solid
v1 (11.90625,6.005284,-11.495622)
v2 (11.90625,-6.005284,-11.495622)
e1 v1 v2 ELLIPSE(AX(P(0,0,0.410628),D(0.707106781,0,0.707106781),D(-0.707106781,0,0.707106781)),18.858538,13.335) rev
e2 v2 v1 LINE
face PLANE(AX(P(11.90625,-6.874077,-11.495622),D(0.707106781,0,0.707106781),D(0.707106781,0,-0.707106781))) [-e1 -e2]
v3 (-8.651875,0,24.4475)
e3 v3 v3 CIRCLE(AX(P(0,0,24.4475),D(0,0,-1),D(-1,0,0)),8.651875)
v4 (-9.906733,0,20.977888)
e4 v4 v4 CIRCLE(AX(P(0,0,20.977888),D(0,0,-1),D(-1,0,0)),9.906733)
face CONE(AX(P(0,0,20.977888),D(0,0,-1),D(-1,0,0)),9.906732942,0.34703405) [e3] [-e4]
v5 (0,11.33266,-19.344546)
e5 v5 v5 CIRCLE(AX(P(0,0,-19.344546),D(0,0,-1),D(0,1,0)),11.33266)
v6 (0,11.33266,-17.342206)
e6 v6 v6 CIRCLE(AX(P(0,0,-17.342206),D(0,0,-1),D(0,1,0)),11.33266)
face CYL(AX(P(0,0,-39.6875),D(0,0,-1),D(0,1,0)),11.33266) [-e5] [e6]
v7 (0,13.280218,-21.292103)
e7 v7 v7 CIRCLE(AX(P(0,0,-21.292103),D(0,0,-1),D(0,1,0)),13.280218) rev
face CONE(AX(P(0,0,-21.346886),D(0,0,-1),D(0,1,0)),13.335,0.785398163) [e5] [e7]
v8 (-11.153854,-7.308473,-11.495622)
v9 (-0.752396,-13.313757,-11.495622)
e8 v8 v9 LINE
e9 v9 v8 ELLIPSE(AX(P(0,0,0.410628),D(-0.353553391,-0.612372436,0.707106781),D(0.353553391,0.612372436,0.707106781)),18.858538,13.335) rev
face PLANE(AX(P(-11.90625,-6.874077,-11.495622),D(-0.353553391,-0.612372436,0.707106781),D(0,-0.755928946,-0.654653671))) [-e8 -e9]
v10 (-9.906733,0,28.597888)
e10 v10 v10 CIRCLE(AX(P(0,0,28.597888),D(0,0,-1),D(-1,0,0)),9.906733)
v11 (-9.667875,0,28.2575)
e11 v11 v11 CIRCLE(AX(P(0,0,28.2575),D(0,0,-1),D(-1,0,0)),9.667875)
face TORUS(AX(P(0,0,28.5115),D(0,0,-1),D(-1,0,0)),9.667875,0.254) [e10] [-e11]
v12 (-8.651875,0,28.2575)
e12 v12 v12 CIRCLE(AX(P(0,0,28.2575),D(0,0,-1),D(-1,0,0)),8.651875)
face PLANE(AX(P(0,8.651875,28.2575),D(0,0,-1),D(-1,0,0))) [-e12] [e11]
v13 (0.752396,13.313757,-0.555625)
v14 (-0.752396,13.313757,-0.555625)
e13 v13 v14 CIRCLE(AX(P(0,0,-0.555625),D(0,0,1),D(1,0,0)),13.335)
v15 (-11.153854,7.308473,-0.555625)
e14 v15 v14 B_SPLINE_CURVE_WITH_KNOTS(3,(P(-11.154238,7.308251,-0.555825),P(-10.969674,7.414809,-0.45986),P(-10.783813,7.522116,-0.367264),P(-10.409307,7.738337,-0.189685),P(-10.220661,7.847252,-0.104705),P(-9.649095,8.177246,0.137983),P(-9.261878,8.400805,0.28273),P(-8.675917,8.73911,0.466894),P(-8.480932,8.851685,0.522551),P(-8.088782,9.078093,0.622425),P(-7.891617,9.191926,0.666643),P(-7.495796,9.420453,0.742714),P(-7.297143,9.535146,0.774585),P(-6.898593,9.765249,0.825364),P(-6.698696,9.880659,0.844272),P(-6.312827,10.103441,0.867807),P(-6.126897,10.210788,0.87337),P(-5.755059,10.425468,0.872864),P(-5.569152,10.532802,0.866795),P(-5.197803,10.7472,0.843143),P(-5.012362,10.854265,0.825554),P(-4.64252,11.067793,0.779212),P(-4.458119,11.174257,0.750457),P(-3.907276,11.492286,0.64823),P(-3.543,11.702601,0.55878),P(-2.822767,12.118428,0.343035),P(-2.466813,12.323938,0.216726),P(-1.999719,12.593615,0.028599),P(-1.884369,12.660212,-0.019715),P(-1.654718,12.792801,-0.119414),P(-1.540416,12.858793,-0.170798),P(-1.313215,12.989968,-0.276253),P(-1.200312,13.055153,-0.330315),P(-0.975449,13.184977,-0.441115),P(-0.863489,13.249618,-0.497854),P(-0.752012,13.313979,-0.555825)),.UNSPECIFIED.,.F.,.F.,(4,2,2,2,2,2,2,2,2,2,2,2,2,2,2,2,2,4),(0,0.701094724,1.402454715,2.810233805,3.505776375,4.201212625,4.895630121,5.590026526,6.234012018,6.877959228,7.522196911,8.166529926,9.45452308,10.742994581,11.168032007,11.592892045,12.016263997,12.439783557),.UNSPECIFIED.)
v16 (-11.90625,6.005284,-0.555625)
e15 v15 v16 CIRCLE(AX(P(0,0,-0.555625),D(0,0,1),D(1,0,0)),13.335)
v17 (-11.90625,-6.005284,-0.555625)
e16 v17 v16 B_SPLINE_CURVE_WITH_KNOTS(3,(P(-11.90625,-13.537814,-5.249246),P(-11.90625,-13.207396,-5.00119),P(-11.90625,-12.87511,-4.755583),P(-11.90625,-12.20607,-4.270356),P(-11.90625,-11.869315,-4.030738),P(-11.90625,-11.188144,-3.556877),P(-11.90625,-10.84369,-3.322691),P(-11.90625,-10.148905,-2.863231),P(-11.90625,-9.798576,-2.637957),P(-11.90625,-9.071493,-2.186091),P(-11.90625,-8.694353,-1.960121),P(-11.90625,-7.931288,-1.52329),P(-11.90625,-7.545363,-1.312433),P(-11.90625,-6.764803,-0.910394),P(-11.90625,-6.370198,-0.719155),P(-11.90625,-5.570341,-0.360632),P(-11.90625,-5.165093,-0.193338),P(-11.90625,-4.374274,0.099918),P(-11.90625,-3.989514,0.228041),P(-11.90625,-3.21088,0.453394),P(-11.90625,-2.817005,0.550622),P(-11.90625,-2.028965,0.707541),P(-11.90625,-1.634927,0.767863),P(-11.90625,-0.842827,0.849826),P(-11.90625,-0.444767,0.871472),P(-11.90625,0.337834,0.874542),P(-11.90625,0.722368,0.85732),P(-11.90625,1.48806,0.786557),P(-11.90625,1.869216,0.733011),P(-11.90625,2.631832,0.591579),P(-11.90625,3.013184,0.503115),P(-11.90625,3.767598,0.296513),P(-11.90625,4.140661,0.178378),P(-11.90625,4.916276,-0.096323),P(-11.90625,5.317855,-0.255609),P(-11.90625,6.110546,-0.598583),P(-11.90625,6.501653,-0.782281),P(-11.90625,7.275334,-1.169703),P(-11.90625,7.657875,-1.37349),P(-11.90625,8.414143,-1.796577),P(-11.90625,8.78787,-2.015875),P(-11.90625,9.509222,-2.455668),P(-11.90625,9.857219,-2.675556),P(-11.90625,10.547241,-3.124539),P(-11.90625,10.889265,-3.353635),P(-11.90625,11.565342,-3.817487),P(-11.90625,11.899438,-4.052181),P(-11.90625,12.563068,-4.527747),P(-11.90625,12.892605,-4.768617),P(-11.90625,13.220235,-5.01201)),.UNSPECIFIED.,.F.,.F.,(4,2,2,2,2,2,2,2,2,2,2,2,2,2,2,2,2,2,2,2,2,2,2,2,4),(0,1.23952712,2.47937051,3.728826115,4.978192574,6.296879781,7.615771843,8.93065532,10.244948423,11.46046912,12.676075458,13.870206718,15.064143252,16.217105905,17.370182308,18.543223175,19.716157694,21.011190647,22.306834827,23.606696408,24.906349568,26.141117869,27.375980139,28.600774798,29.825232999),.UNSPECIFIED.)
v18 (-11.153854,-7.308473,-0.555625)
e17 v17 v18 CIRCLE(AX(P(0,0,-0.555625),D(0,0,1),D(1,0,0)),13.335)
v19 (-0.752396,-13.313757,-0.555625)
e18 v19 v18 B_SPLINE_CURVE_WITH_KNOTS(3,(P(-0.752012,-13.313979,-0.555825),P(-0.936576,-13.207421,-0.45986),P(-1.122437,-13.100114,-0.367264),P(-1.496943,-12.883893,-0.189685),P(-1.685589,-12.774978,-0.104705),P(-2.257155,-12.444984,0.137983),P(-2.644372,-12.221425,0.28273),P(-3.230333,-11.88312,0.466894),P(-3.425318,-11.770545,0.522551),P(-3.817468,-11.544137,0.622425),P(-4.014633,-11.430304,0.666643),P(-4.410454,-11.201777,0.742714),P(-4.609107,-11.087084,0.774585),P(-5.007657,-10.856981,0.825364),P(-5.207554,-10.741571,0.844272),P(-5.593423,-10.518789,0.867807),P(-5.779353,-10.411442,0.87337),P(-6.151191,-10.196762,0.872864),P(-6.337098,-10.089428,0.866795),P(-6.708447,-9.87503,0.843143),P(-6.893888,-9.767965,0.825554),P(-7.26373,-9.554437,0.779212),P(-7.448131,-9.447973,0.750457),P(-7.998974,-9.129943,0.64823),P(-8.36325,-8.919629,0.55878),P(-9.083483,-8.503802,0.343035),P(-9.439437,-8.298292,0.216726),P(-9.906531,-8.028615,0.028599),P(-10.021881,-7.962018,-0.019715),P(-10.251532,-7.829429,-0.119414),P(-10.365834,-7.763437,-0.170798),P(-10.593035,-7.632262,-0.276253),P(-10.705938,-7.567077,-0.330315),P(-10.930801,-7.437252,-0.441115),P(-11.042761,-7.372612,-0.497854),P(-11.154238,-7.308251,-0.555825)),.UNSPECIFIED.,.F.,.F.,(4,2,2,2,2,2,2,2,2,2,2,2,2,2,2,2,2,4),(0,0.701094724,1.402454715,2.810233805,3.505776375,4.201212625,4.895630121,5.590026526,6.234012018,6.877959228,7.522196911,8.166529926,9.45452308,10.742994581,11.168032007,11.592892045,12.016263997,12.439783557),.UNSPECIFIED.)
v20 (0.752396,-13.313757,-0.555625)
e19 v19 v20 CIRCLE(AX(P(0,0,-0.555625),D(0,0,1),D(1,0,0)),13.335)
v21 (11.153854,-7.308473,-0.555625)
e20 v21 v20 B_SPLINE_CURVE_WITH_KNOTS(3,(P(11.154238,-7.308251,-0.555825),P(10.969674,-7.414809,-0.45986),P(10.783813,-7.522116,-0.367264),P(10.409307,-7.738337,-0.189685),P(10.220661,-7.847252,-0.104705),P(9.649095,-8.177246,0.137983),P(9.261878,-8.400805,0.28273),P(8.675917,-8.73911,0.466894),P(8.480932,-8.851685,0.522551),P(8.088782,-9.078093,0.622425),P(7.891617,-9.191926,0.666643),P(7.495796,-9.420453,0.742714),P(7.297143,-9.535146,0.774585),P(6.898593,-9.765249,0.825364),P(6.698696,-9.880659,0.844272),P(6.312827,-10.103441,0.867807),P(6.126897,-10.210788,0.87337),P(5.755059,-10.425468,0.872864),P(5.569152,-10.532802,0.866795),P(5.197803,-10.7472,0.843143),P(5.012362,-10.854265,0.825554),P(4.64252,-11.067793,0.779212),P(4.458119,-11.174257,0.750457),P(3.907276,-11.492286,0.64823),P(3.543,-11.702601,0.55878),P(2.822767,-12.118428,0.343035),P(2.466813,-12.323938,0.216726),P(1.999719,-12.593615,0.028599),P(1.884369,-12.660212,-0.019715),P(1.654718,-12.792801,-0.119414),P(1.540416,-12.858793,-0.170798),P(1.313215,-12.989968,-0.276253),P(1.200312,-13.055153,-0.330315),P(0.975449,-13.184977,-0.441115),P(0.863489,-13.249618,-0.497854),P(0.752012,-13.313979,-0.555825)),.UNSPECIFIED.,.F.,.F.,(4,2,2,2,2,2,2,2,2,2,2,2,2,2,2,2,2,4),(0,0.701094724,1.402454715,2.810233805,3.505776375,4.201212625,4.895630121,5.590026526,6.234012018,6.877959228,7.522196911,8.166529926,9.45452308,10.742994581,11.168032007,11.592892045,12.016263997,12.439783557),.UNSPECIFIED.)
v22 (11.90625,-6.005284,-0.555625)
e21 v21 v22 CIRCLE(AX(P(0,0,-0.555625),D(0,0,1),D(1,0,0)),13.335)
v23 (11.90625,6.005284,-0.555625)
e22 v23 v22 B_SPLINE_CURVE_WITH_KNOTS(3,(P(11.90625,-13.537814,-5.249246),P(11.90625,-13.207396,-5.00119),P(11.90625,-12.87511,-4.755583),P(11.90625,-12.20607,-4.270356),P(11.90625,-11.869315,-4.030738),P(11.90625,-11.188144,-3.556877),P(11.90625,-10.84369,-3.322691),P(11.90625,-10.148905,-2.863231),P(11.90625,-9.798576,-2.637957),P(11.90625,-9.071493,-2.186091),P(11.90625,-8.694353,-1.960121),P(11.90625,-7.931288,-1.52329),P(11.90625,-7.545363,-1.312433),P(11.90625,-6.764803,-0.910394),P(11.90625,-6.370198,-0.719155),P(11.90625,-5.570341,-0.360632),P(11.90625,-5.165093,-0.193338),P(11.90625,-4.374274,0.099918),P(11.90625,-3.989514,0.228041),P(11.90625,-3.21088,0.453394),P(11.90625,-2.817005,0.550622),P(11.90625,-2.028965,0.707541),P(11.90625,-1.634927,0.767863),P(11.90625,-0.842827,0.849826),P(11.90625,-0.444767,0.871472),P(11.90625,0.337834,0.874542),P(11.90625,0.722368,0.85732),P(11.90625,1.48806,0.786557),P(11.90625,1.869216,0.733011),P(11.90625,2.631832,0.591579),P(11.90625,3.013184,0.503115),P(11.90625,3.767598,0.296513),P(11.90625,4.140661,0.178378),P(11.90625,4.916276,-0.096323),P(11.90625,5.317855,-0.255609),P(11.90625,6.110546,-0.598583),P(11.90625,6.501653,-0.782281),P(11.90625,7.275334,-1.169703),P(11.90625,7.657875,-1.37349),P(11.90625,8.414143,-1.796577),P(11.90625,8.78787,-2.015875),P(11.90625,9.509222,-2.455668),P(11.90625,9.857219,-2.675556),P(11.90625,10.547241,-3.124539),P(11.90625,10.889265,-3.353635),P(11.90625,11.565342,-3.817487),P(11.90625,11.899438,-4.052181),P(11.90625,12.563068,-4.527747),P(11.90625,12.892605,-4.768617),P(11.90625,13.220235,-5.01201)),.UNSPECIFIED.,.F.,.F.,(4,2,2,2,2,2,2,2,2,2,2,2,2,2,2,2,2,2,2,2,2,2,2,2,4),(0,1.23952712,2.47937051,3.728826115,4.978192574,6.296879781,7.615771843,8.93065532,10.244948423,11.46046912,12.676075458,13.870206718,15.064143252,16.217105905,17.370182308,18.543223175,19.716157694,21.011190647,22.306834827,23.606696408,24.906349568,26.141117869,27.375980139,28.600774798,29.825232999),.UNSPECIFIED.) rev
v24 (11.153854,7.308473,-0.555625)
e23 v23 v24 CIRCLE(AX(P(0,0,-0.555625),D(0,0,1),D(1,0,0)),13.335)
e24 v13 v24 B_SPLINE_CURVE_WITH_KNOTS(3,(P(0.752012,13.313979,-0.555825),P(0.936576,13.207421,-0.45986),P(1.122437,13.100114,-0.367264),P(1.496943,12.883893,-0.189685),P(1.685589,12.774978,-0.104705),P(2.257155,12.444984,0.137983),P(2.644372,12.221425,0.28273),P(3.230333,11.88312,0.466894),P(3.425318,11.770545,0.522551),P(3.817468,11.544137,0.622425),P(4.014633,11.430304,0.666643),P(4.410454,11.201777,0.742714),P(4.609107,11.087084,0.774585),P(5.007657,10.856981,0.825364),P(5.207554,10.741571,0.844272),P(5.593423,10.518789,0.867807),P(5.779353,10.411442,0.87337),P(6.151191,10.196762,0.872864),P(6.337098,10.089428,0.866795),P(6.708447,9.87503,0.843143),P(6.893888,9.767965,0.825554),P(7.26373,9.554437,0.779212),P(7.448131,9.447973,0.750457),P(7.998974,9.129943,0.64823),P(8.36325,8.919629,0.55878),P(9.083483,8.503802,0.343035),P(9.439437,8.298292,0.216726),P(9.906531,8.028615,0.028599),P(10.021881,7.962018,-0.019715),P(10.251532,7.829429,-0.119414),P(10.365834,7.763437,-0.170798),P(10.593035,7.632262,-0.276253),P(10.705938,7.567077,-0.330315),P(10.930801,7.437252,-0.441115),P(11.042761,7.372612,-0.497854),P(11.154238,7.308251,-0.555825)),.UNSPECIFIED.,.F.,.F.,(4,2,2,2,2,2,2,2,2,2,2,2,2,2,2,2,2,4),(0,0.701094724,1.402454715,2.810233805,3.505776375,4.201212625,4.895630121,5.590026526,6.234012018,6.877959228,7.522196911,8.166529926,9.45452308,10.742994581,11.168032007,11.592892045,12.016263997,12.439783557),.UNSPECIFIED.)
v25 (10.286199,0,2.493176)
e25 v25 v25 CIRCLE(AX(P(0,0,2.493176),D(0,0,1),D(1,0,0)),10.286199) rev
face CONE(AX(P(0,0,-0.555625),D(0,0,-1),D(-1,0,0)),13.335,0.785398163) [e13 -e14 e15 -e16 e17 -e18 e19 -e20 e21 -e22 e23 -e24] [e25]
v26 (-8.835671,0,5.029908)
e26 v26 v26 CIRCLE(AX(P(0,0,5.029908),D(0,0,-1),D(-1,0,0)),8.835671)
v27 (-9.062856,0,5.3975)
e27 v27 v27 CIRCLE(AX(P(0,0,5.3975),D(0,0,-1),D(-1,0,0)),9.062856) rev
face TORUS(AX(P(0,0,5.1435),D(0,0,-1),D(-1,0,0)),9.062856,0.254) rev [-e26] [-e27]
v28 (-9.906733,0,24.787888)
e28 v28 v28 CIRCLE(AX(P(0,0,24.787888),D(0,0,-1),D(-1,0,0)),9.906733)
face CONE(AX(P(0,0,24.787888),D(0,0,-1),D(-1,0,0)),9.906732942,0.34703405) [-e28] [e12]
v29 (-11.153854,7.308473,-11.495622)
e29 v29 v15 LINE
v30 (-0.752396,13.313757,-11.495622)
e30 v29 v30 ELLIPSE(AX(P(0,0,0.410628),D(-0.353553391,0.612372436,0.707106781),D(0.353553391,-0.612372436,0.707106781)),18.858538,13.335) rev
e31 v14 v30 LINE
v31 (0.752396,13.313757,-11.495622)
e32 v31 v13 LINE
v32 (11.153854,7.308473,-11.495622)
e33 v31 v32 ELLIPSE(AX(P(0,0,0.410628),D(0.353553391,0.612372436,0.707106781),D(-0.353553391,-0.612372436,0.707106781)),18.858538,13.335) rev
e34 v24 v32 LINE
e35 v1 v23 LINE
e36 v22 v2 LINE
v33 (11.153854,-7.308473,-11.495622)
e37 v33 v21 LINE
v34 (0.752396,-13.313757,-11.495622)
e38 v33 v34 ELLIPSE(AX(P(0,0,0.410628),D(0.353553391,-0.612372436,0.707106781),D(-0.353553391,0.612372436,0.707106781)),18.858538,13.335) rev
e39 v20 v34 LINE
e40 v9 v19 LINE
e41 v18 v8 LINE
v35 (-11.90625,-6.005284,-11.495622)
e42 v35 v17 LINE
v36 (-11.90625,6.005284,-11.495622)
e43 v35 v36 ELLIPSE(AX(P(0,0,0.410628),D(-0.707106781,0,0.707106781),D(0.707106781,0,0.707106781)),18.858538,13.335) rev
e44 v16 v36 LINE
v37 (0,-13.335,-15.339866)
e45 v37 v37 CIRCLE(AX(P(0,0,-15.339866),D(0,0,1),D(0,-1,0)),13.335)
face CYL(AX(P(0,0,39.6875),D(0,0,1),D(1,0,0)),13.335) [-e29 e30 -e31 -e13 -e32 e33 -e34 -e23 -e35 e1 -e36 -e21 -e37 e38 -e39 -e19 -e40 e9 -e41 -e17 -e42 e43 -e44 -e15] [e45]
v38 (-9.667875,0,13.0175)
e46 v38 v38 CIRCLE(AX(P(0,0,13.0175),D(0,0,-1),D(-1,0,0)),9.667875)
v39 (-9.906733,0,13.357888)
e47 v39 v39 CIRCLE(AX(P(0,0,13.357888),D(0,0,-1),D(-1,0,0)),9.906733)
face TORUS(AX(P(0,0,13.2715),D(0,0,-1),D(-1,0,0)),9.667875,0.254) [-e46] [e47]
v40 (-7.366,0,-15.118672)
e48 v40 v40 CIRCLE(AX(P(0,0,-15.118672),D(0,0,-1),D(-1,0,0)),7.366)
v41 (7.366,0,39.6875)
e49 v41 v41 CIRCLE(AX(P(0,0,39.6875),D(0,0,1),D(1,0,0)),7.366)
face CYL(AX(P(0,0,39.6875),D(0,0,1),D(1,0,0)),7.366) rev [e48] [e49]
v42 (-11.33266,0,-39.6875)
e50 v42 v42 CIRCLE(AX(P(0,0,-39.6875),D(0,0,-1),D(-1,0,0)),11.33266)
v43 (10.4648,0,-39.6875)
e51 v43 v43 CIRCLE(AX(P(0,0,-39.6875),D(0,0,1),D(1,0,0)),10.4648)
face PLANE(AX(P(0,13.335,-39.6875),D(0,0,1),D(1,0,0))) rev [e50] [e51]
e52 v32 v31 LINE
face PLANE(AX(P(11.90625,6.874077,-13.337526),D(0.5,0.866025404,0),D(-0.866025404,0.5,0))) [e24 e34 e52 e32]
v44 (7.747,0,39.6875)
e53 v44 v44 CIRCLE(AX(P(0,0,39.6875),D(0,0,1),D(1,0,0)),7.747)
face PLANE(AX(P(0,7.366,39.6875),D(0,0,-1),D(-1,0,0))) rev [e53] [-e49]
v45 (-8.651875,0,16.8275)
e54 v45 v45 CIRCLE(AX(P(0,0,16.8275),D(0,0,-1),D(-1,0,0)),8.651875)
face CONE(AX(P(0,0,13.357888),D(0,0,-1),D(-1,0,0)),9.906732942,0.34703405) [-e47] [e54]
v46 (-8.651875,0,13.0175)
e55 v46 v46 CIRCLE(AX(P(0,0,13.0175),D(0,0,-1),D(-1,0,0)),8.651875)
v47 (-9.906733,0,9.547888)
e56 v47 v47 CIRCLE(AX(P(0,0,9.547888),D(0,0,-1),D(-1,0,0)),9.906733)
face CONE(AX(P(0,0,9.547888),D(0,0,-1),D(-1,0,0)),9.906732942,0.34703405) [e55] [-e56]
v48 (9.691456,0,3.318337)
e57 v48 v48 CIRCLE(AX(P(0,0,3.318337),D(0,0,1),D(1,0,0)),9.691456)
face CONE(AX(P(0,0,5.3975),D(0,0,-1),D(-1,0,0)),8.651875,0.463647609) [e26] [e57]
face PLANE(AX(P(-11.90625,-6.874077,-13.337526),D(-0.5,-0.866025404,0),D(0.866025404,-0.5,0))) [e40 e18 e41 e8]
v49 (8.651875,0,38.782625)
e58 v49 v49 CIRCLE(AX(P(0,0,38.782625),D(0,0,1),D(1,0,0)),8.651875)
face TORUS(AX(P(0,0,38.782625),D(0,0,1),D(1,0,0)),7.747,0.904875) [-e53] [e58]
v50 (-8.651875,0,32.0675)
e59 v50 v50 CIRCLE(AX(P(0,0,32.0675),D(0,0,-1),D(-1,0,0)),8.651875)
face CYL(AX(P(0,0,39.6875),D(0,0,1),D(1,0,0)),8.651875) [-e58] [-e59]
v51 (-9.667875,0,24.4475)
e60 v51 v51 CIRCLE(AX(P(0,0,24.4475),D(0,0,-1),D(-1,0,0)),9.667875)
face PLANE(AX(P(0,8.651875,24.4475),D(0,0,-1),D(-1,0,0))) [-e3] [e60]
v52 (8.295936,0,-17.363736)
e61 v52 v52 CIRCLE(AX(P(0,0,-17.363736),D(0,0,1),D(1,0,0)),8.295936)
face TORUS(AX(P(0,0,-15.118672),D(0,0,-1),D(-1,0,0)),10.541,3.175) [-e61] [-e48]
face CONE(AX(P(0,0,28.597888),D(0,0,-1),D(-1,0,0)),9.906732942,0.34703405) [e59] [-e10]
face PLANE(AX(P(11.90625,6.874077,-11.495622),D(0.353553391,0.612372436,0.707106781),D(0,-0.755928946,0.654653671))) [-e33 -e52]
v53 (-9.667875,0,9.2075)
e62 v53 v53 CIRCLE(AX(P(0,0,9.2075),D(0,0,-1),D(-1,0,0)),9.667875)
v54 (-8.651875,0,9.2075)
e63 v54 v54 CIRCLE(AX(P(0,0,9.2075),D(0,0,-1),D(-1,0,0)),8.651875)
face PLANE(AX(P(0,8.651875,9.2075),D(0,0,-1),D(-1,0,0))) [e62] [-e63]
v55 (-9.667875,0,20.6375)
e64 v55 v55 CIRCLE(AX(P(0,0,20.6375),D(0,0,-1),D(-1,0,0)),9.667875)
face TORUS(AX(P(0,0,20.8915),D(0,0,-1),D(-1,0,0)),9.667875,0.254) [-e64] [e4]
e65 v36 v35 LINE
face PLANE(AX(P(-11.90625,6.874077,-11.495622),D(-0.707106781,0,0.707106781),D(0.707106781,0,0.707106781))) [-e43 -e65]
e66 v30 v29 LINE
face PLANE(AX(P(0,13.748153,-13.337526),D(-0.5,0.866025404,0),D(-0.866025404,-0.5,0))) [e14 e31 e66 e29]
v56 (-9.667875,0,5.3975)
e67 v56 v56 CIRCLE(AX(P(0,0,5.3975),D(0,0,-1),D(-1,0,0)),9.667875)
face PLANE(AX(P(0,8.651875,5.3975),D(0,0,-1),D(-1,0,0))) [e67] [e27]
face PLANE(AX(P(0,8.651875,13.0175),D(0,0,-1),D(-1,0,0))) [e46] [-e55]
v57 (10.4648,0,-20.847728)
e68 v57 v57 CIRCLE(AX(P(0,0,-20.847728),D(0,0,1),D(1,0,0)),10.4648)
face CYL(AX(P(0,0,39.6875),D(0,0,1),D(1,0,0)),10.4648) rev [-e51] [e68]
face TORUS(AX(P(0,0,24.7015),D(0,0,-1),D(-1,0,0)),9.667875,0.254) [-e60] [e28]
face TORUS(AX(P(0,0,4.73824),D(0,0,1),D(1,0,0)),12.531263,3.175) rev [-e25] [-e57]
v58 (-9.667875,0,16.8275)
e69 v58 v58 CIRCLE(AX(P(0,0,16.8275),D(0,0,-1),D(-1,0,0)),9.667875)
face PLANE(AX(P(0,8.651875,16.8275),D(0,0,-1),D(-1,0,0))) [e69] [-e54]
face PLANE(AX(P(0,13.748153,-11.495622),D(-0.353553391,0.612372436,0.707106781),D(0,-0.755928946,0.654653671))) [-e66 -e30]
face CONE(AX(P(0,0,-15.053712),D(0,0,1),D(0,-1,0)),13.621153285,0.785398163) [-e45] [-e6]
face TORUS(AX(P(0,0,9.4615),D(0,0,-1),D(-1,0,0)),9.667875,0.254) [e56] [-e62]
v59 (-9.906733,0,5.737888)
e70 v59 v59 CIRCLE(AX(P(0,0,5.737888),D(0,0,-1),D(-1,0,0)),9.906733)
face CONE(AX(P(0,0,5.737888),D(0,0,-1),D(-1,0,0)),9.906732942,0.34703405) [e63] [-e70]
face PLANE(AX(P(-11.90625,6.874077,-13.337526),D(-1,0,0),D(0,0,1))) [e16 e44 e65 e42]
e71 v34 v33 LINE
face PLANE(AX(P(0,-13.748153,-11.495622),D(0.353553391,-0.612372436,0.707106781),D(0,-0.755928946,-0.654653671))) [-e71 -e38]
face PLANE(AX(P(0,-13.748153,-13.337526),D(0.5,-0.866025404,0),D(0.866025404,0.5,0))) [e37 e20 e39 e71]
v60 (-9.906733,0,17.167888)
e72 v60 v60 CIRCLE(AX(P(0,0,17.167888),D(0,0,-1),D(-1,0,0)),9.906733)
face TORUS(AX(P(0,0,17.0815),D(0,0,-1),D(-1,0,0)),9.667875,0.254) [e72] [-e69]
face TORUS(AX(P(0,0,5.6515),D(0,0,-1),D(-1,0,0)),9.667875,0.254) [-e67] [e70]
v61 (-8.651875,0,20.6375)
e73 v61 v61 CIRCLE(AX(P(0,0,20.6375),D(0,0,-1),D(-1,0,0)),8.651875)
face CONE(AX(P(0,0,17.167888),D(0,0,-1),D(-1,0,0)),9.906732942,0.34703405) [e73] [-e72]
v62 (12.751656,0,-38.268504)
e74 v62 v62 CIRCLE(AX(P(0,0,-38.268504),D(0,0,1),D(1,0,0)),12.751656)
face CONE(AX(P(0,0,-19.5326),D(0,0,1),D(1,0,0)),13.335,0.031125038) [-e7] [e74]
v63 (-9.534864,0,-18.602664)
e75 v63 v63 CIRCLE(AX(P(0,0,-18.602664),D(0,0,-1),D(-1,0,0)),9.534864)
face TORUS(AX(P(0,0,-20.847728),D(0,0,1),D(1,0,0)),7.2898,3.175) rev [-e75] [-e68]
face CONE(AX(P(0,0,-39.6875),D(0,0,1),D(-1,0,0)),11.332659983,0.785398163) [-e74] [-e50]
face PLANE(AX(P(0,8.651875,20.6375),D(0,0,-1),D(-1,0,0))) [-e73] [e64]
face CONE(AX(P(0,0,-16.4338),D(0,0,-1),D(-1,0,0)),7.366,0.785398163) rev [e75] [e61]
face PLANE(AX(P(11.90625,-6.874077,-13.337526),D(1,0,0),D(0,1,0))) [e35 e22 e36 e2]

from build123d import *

# Parameters (mm, degrees)
LPATTERN1_COUNT    = 7
LPATTERN1_PITCH    = 3.81
FILLET1_R          = 0.254
FILLET2_R          = 3.175
SKETCH7_OUTSIDE_W  = 211.416
SKETCH7_OUTSIDE_H  = 211.416
SKETCH7_OUTSIDE_R  = 11.332659983
CUT_EXTRUDE1_DEPTH = 82.584527309
CUT_EXTRUDE1_DRAFT = -45
SKETCH9_OUTSIDE_W  = 46.246
SKETCH9_OUTSIDE_H  = 46.246
CUT_EXTRUDE2_DEPTH = 18.735026
CHAMFER1_SIZE      = 1.841903285


# Read off the part's stored shape, not the designer's step: Cut-Revolve2
with BuildPart() as part:
    # Sketch2 → Revolve1 (revolve)
    with BuildSketch(Plane(origin=(0, 0, 0), x_dir=(0, 0, -1), z_dir=(1, 0, 0)), mode=Mode.PRIVATE) as revolve1_sk:
        Polygon((-39.6875, 7.366), (-39.6875, 9.921875), (-2.8575, 9.921875), (0.555625, 13.335), (39.6875, 13.335), (39.6875, 10.4648), (19.5326, 10.4648), (16.4338, 7.366), align=None)
    revolve(revolve1_sk.sketch.rotate(Axis((0, 0, 39.6875), (0, 0, -1)), 90), axis=Axis((0, 0, 39.6875), (0, 0, -1)))

    # Sketch3 → Cut-Revolve1 (revolve, cut)
    with BuildSketch(Plane(origin=(0, 0, 0), x_dir=(0, 0, -1), z_dir=(1, 0, 0)), mode=Mode.PRIVATE) as cut_revolve1_sk:
        with BuildLine():
            Line((-39.6875, 9.921875), (-39.6875, 7.747))
            ThreePointArc((-39.6875, 7.747), (-39.422468249, 8.386843249), (-38.782625, 8.651875))
            Line((-38.782625, 8.651875), (-5.3975, 8.651875))
            Line((-5.3975, 8.651875), (-2.8575, 9.921875))
            Line((-2.8575, 9.921875), (-39.6875, 9.921875))
        make_face()
        Polygon((19.5326, 13.335), (39.6875, 13.335), (39.6875, 12.707475311), align=None)
    revolve(cut_revolve1_sk.sketch.rotate(Axis((0, 0, 39.6875), (0, 0, -1)), 90), axis=Axis((0, 0, 39.6875), (0, 0, -1)), mode=Mode.SUBTRACT)

    # Sketch4 → Revolve2 (revolve)
    with BuildSketch(Plane(origin=(0, 0, 0), x_dir=(0, 0, -1), z_dir=(1, 0, 0)), mode=Mode.PRIVATE) as revolve2_sk:
        with BuildLine():
            Line((-5.3975, 8.651875), (-5.3975, 9.667875))
            ThreePointArc((-5.3975, 9.667875), (-5.505600287, 9.875791507), (-5.737887983, 9.906732942))
            Line((-5.737887983, 9.906732942), (-9.2075, 8.651875))
            Line((-9.2075, 8.651875), (-5.3975, 8.651875))
        make_face()
    revolve2 = revolve(revolve2_sk.sketch.rotate(Axis((0, 0, 5.3975), (0, 0, 1)), 90), axis=Axis((0, 0, 5.3975), (0, 0, 1)))

    # LPattern1: Revolve2 ×7
    with Locations(*[(0, 0, i * LPATTERN1_PITCH) for i in range(1, LPATTERN1_COUNT)]):
        add(revolve2)

    # Fillet1
    fillet1_edges = [part.edges().sort_by_distance(p)[0] for p in [
        (-8.651875, 0, 5.3975),
    ]]
    fillet(fillet1_edges, radius=FILLET1_R)

    # Fillet2
    fillet2_edges = [part.edges().sort_by_distance(p)[0] for p in [
        (-9.921875, 0, 2.8575),
        (-7.366, 0, -16.4338),
        (-10.4648, 0, -19.5326),
    ]]
    fillet(fillet2_edges, radius=FILLET2_R)


with BuildPart() as cut_extrude1_tool:
    # Sketch7 outside → Cut-Extrude1 (with draft: the straight prism first)
    with BuildSketch(Plane(origin=(0, 0, -39.6875), x_dir=(-1, 0, 0), z_dir=(0, 0, -1))):
        Rectangle(SKETCH7_OUTSIDE_W, SKETCH7_OUTSIDE_H)
        Circle(SKETCH7_OUTSIDE_R, mode=Mode.SUBTRACT)
    extrude(amount=-CUT_EXTRUDE1_DEPTH)
    # Cut-Extrude1: the draft: its side faces are tilted about the plane it starts from
    cut_extrude1_sides = [cut_extrude1_tool.faces().sort_by_distance(p)[0] for p in [
        (0, -105.708, 1.604763654),
        (-105.708, 0, 1.604763654),
        (0, 105.708, 1.604763654),
        (105.708, 0, 1.604763654),
        (11.332659983, 0, 1.604763654),
    ]]
    draft(cut_extrude1_sides, Plane(origin=(0, 0, -39.6875), x_dir=(-1, 0, 0), z_dir=(0, 0, -1)), CUT_EXTRUDE1_DRAFT)


with BuildPart() as part_1:
    add(part.part)

    # Cut-Extrude1: cut by cut_extrude1_tool
    add(cut_extrude1_tool.part, mode=Mode.SUBTRACT)

    # Cut-Revolve2 outline → Cut-Revolve2 (revolve, cut)
    with BuildSketch(Plane.XZ):
        Polygon((11.332659983, -17.34220568), (11.332659983, -19.344545697), (13.280217697, -21.292103412), (13.335, -21.292103412), (13.335, -15.339865662), align=None)
    revolve(axis=Axis((0, 0, 0), (0, 0, 1)), mode=Mode.SUBTRACT)

    # Sketch9 outside → Cut-Extrude2 (cut)
    with BuildSketch(Plane.XY.offset(5.3975)):
        Rectangle(SKETCH9_OUTSIDE_W, SKETCH9_OUTSIDE_H)
        Polygon((0, 13.748153285), (-11.90625, 6.874076643), (-11.90625, -6.874076643), (0, -13.748153285), (11.90625, -6.874076643), (11.90625, 6.874076643), align=None, mode=Mode.SUBTRACT)
    extrude(amount=-CUT_EXTRUDE2_DEPTH, mode=Mode.SUBTRACT)

    # Chamfer1
    # the kernel refuses this chamfer: 1.841903285 mm, written as the material it adds along each edge
    with BuildSketch(Plane(origin=(15.256035138, 4.940077291, -13.337526), x_dir=(-0.01374793830529338, -0.02381212764409052, 0.9996219169112968), z_dir=(-0.8660254037844388, 0.4999999999999997, 0))) as chamfer1_piece_1_section:
        Polygon((CHAMFER1_SIZE * 0.999621916954, CHAMFER1_SIZE * 0.0274958766118), (-CHAMFER1_SIZE * 0.0274958766118, CHAMFER1_SIZE * 0.999621916954), (0, 0), align=None)
    chamfer1_piece_1 = extrude(amount=21.48415069, mode=Mode.PRIVATE)
    chamfer1_piece_1 = chamfer1_piece_1 & Plane(origin=(0, 0, -12.639000405), x_dir=(1, 0, 0), z_dir=(0, 0, -1)) * Cylinder(13.335, 51, mode=Mode.PRIVATE)
    add(chamfer1_piece_1)
    with BuildSketch(Plane(origin=(-15.256035138, -4.940077291, -13.337526), x_dir=(0.013747938305293347, 0.023812127644090464, 0.9996219169112968), z_dir=(0.8660254037844388, -0.49999999999999967, 0))) as chamfer1_piece_2_section:
        Polygon((CHAMFER1_SIZE * 0.999621916954, CHAMFER1_SIZE * 0.0274958766118), (-CHAMFER1_SIZE * 0.0274958766118, CHAMFER1_SIZE * 0.999621916954), (0, 0), align=None)
    chamfer1_piece_2 = extrude(amount=21.48415069, mode=Mode.PRIVATE)
    chamfer1_piece_2 = chamfer1_piece_2 & Plane(origin=(0, 0, -12.639000405), x_dir=(1, 0, 0), z_dir=(0, 0, -1)) * Cylinder(13.335, 51, mode=Mode.PRIVATE)
    add(chamfer1_piece_2)
    with BuildSketch(Plane(origin=(-11.90625, 10.742075345, -13.337526), x_dir=(0.027495876610586077, 0, 0.9996219169112968), z_dir=(0, -1, 0))) as chamfer1_piece_3_section:
        Polygon((CHAMFER1_SIZE * 0.999621916954, CHAMFER1_SIZE * 0.0274958766117), (-CHAMFER1_SIZE * 0.0274958766117, CHAMFER1_SIZE * 0.999621916954), (0, 0), align=None)
    chamfer1_piece_3 = extrude(amount=21.48415069, mode=Mode.PRIVATE)
    chamfer1_piece_3 = chamfer1_piece_3 & Plane(origin=(0, 0, -12.639000417), x_dir=(1, 0, 0), z_dir=(0, 0, -1)) * Cylinder(13.335, 51, mode=Mode.PRIVATE)
    add(chamfer1_piece_3)
    with BuildSketch(Plane(origin=(3.349785138, 15.682152636, -13.337526), x_dir=(0.013747938305293033, -0.023812127644089905, 0.9996219169112968), z_dir=(-0.8660254037844387, -0.49999999999999994, 0))) as chamfer1_piece_4_section:
        Polygon((CHAMFER1_SIZE * 0.999621916954, CHAMFER1_SIZE * 0.0274958766118), (-CHAMFER1_SIZE * 0.0274958766117, CHAMFER1_SIZE * 0.999621916954), (0, 0), align=None)
    chamfer1_piece_4 = extrude(amount=21.48415069, mode=Mode.PRIVATE)
    chamfer1_piece_4 = chamfer1_piece_4 & Plane(origin=(0, 0, -12.639000405), x_dir=(1, 0, 0), z_dir=(0, 0, -1)) * Cylinder(13.335, 51, mode=Mode.PRIVATE)
    add(chamfer1_piece_4)
    with BuildSketch(Plane(origin=(-3.349785138, -15.682152636, -13.337526), x_dir=(-0.01374793830529321, 0.02381212764409021, 0.9996219169112968), z_dir=(0.8660254037844387, 0.49999999999999994, 0))) as chamfer1_piece_5_section:
        Polygon((CHAMFER1_SIZE * 0.999621916954, CHAMFER1_SIZE * 0.0274958766118), (-CHAMFER1_SIZE * 0.0274958766118, CHAMFER1_SIZE * 0.999621916954), (0, 0), align=None)
    chamfer1_piece_5 = extrude(amount=21.48415069, mode=Mode.PRIVATE)
    chamfer1_piece_5 = chamfer1_piece_5 & Plane(origin=(0, 0, -12.639000405), x_dir=(1, 0, 0), z_dir=(0, 0, -1)) * Cylinder(13.335, 51, mode=Mode.PRIVATE)
    add(chamfer1_piece_5)
    with BuildSketch(Plane(origin=(11.90625, -10.742075345, -13.337526), x_dir=(-0.027495876610586077, 0, 0.9996219169112968), z_dir=(0, 1, 0))) as chamfer1_piece_6_section:
        Polygon((CHAMFER1_SIZE * 0.999621916954, CHAMFER1_SIZE * 0.0274958766117), (-CHAMFER1_SIZE * 0.0274958766117, CHAMFER1_SIZE * 0.999621916954), (0, 0), align=None)
    chamfer1_piece_6 = extrude(amount=21.48415069, mode=Mode.PRIVATE)
    chamfer1_piece_6 = chamfer1_piece_6 & Plane(origin=(0, 0, -12.639000405), x_dir=(1, 0, 0), z_dir=(0, 0, -1)) * Cylinder(13.335, 51, mode=Mode.PRIVATE)
    add(chamfer1_piece_6)


solid = part_1.part
